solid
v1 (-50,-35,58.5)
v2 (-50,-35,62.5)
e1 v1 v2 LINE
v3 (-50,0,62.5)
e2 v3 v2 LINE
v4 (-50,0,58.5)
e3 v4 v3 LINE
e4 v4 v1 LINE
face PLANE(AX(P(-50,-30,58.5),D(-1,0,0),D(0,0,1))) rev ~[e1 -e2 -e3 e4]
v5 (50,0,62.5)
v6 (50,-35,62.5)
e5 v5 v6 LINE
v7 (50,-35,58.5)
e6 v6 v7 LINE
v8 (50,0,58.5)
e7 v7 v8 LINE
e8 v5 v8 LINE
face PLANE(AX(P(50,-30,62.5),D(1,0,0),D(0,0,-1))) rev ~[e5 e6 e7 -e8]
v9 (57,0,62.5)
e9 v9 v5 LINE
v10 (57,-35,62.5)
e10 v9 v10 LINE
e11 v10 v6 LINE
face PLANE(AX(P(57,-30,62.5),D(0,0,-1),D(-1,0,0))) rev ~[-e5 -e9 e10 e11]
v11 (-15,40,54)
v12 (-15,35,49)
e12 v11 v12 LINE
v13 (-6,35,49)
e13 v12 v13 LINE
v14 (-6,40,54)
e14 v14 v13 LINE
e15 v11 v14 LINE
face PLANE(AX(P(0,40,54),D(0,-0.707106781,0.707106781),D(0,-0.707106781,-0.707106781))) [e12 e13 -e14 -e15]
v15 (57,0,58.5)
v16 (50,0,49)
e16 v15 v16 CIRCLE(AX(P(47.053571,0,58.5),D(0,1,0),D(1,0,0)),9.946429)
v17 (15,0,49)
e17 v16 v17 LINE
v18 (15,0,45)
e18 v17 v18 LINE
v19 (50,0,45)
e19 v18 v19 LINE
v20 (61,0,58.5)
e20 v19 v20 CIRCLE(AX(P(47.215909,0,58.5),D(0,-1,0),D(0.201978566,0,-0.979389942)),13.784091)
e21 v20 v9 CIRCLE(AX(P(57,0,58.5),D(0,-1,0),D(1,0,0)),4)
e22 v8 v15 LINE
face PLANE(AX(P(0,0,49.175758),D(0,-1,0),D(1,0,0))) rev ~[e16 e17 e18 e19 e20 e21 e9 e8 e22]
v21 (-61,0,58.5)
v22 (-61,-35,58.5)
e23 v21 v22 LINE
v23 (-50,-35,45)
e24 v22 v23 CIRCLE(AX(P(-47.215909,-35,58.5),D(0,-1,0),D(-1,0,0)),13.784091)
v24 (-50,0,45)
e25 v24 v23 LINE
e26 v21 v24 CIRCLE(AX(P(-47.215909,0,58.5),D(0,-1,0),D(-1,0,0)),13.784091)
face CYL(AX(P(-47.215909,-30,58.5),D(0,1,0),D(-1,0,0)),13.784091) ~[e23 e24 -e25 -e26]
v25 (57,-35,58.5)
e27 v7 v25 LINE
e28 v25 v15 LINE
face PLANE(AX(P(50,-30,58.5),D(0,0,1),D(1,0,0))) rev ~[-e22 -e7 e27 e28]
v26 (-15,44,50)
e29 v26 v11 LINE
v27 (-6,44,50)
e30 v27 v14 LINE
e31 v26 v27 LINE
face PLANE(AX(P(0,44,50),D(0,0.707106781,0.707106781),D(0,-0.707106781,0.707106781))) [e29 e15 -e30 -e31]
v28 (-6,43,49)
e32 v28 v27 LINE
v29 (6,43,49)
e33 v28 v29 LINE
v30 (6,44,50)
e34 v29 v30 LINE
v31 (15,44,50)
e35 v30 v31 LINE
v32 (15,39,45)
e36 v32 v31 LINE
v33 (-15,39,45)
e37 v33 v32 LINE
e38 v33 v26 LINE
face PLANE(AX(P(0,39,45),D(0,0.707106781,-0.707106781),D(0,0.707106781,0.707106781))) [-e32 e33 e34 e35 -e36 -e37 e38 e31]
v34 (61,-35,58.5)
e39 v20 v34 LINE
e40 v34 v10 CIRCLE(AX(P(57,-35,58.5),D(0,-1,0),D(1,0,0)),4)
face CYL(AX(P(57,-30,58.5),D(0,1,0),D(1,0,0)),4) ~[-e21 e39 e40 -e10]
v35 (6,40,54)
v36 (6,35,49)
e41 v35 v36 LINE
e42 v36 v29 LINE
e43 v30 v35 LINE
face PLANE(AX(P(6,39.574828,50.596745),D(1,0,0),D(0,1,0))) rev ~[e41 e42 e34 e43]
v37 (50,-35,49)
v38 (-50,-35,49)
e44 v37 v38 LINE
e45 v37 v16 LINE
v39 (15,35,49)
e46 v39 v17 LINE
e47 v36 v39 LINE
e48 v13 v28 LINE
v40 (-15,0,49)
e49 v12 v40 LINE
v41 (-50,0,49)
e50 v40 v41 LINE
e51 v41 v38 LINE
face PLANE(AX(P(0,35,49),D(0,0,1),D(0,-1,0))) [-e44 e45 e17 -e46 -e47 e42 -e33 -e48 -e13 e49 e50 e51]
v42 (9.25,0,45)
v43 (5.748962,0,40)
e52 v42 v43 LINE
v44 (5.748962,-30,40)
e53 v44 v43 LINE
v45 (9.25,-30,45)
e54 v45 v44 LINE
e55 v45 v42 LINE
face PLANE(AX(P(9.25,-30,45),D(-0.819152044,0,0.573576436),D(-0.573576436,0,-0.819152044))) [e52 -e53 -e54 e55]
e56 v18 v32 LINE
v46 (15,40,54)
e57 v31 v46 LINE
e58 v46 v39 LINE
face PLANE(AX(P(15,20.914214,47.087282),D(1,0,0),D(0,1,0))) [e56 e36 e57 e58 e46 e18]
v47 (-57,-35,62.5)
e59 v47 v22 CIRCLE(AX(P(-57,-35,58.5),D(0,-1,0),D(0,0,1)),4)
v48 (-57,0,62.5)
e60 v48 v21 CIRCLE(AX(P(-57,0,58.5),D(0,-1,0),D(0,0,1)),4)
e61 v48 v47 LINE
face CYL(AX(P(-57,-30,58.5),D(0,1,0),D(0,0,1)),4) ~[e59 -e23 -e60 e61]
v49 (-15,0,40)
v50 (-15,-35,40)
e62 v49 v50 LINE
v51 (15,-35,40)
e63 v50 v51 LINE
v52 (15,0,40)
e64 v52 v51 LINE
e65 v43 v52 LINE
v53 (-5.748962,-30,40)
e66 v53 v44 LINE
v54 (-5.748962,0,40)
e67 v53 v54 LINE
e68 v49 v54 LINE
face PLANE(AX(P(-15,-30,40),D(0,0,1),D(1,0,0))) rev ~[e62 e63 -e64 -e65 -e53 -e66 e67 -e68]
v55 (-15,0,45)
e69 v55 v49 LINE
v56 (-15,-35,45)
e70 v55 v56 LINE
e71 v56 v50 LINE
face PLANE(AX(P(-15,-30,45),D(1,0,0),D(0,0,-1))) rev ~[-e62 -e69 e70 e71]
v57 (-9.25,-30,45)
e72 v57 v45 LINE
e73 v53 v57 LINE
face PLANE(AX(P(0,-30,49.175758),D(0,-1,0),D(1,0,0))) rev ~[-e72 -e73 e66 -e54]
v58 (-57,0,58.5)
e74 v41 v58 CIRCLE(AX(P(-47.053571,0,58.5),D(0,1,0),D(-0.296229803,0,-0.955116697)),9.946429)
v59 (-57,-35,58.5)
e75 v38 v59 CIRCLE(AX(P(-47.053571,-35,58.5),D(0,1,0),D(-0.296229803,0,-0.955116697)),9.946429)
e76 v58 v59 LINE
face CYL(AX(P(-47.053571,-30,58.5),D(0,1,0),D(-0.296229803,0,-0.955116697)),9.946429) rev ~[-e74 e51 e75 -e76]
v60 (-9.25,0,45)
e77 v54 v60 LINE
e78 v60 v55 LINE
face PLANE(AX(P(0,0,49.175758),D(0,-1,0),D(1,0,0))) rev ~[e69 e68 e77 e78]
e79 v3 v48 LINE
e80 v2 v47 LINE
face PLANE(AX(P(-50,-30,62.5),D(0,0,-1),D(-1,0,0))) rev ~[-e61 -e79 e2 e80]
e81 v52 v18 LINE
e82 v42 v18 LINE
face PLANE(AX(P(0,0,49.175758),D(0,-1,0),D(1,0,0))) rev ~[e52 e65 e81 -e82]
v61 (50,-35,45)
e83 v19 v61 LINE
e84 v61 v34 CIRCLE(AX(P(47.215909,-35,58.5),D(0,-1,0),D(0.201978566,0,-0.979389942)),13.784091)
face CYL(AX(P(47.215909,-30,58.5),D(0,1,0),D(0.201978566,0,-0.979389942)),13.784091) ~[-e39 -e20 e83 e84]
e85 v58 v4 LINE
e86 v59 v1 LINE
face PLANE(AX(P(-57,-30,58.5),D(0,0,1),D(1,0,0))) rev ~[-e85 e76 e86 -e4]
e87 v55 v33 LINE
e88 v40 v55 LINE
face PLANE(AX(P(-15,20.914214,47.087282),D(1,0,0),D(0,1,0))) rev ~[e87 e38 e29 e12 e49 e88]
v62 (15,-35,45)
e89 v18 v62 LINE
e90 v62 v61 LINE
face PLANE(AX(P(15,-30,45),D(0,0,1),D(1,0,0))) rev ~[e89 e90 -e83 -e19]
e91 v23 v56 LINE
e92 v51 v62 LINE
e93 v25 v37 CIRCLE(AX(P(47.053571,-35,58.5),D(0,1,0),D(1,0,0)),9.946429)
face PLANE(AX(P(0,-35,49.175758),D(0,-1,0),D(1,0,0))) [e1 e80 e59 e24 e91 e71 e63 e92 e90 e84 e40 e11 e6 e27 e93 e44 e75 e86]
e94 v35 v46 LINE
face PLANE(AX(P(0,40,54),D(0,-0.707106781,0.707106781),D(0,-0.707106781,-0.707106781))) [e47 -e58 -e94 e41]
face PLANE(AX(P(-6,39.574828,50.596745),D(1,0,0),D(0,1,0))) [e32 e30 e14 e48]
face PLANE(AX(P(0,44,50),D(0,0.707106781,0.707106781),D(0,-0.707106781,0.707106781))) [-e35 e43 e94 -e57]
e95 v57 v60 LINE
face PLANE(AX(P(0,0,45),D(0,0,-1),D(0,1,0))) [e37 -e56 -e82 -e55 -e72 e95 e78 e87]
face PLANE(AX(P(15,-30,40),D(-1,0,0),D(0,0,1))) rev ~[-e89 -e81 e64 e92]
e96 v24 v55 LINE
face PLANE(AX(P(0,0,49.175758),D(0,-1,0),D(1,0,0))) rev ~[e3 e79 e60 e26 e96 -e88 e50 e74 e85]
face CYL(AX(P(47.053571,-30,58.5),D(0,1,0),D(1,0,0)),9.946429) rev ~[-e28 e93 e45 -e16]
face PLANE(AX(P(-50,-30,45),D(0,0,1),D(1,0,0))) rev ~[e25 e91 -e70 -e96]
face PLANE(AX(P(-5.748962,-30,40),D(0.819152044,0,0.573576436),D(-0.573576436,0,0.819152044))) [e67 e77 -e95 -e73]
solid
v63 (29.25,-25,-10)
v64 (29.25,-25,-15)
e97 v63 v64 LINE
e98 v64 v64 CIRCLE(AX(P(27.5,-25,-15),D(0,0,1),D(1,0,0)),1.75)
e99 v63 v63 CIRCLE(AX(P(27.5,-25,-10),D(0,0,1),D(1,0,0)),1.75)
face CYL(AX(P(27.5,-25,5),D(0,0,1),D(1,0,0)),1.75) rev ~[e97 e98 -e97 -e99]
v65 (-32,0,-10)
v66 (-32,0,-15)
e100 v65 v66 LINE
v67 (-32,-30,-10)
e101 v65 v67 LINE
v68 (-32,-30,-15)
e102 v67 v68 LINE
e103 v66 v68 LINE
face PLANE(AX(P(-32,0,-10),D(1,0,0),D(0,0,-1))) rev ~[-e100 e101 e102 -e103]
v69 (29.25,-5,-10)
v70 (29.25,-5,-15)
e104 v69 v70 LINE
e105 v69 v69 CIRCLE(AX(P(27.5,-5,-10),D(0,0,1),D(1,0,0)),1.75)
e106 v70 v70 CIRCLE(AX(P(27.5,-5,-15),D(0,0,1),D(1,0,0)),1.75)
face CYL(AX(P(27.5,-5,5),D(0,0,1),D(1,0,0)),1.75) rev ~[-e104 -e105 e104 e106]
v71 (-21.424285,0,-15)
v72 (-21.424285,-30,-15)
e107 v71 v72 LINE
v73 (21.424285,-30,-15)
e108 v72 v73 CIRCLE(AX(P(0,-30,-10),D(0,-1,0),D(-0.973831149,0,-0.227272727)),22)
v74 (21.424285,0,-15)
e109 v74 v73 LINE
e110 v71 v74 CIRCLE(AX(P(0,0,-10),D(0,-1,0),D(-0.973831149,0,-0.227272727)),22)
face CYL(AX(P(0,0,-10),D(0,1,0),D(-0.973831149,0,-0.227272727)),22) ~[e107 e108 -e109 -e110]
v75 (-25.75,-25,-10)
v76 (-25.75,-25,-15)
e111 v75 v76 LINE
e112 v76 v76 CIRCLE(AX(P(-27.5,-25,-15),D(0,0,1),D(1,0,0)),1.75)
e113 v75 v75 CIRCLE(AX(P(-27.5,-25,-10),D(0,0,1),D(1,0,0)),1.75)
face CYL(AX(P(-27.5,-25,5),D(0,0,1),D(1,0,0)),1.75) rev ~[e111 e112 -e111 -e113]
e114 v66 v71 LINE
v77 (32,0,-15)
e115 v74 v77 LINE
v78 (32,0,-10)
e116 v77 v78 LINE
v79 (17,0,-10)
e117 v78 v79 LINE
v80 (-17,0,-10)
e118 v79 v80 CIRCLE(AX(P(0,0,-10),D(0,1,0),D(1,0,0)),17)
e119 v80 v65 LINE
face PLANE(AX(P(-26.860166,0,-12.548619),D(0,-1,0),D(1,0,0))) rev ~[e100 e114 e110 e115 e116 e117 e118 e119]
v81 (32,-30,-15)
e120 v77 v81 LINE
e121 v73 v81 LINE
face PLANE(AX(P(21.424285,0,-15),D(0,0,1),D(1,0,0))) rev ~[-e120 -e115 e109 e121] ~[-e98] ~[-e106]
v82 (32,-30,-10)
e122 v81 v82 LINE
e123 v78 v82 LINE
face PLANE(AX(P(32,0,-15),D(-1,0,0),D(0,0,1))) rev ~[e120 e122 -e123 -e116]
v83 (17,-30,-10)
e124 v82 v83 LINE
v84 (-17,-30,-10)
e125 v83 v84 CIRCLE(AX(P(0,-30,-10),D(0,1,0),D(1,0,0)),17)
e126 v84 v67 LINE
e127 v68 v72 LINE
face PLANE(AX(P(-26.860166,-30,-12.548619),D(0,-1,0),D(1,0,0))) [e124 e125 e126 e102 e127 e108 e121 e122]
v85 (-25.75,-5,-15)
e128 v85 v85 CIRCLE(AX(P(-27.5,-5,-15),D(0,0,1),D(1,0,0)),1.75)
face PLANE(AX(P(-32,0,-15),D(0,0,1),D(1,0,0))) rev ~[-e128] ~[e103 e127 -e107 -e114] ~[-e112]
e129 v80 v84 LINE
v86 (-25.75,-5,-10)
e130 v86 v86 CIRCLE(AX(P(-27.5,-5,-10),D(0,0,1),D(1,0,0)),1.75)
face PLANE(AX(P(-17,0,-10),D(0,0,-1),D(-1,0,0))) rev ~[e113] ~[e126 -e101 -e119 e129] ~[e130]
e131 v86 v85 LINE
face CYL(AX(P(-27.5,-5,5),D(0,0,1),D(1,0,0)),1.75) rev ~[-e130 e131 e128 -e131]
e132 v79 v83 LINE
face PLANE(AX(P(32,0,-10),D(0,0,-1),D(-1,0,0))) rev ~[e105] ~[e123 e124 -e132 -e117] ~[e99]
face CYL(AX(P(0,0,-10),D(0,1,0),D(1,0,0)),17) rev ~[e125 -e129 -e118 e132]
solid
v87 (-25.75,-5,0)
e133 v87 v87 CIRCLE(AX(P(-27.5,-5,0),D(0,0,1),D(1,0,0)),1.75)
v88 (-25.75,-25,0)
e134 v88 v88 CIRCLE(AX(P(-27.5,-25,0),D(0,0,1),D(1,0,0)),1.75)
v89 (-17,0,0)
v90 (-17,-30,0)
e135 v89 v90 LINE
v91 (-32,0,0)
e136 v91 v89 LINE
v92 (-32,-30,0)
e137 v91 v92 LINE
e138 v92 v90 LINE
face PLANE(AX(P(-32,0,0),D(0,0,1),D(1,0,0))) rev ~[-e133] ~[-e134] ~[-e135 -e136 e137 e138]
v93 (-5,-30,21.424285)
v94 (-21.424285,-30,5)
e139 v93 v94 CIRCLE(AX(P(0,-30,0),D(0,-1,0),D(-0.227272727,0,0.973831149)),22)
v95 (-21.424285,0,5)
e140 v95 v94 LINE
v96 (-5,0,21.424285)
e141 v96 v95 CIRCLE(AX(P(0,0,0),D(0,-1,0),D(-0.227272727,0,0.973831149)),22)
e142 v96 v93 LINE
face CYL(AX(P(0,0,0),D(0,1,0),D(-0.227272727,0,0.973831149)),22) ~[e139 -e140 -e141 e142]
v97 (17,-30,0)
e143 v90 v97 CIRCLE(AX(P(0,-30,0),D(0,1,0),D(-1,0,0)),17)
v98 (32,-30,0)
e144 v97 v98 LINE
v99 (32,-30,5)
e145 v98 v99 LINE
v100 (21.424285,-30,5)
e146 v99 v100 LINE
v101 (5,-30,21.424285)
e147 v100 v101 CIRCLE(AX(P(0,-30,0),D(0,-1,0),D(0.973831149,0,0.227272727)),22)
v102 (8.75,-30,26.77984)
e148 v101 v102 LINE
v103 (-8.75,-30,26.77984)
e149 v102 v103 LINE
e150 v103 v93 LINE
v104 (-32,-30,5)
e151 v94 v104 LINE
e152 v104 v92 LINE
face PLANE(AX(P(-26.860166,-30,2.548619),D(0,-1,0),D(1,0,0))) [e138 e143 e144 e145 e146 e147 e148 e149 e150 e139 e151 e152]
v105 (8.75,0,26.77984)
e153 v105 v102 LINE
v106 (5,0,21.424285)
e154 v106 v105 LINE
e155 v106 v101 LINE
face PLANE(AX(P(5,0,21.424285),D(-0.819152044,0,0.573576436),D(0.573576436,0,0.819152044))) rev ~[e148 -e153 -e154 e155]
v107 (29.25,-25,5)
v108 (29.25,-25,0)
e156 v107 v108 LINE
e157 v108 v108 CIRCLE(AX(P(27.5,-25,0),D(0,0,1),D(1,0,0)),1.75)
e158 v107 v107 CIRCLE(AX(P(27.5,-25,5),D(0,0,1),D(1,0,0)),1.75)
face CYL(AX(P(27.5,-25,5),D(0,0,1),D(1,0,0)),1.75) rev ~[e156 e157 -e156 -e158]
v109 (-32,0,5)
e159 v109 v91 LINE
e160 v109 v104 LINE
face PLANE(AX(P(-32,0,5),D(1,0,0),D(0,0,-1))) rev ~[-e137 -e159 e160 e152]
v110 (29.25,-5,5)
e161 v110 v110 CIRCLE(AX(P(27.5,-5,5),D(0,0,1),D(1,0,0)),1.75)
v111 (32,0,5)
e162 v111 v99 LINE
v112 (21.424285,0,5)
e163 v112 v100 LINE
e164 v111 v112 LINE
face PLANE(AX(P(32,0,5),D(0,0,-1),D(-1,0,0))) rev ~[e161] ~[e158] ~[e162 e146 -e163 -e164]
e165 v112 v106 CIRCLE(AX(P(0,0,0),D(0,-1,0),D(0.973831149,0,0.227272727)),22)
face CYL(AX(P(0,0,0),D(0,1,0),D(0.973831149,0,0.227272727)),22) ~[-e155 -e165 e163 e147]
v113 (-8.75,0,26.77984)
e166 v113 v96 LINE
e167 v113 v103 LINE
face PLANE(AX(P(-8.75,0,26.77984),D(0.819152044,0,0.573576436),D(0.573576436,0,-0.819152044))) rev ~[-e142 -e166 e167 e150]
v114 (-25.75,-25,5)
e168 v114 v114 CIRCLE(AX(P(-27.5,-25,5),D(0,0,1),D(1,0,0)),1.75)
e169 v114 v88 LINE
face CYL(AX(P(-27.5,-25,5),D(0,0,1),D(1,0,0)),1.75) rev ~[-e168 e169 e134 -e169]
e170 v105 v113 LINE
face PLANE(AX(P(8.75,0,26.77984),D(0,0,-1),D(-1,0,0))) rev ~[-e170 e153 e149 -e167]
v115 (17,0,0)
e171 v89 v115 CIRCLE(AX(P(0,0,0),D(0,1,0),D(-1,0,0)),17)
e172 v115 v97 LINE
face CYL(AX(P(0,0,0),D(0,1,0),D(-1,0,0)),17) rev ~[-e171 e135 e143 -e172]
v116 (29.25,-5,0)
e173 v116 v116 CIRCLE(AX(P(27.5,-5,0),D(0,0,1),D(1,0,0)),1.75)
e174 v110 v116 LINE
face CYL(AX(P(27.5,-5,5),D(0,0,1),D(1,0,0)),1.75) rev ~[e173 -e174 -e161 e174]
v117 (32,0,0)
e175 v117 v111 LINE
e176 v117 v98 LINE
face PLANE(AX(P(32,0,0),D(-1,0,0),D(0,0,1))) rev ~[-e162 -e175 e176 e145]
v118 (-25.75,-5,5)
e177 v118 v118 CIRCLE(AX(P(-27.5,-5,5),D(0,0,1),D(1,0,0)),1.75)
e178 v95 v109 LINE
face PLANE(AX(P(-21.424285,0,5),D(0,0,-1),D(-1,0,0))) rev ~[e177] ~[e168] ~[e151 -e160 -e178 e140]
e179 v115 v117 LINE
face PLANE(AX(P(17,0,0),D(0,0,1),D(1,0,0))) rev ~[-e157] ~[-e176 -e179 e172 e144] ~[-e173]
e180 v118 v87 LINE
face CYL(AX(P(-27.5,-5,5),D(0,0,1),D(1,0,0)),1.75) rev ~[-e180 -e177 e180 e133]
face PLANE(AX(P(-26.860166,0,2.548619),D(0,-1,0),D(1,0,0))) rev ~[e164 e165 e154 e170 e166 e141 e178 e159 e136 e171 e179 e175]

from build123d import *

# Parameters (mm, degrees)
F3_DEPTH      = 30
F4_DEPTH      = 5
F6_DEPTH      = 15
F6_DEPTH_BACK = 15
F7_DEPTH      = 6
F8_DEPTH      = 30
F9_DEPTH      = 30
F10_R         = 1.75
F11_DEPTH     = 50


# Not quite as in the source:
# - a feature names something its author has since deleted; it is built from what else it names


with BuildPart() as f3:
    # F2 (on offset) → F3 (new body)
    with BuildSketch(Plane.XZ.offset(30)):
        with BuildLine():
            Line((50, 49), (-50, 49))
            ThreePointArc((-50, 49), (-55.0610018108, 52.5997881394), (-57, 58.5))
            Line((-57, 58.5), (-50, 58.5))
            Line((-50, 58.5), (-50, 62.5))
            Line((-50, 62.5), (-57, 62.5))
            ThreePointArc((-57, 62.5), (-59.8284271247, 61.3284271247), (-61, 58.5))
            ThreePointArc((-61, 58.5), (-57.9018186072, 49.7929626164), (-50, 45))
            Line((-50, 45), (-15, 45))
            Line((-15, 45), (-15, 40))
            Line((-15, 40), (-5.748962309, 40))
            Line((-5.748962309, 40), (-9.25, 45))
            Line((-9.25, 45), (9.25, 45))
            Line((9.25, 45), (5.748962309, 40))
            Line((5.748962309, 40), (15, 40))
            Line((15, 40), (15, 45))
            Line((15, 45), (50, 45))
            ThreePointArc((50, 45), (57.9018186072, 49.7929626164), (61, 58.5))
            ThreePointArc((61, 58.5), (59.8284271247, 61.3284271247), (57, 62.5))
            Line((57, 62.5), (50, 62.5))
            Line((50, 62.5), (50, 58.5))
            Line((50, 58.5), (57, 58.5))
            ThreePointArc((57, 58.5), (55.0610018108, 52.5997881394), (50, 49))
        make_face()
    extrude(amount=-F3_DEPTH)

    # F2 (on offset) → F4 (join)
    with BuildSketch(Plane.XZ.offset(30)):
        with BuildLine():
            Line((50, 49), (-50, 49))
            ThreePointArc((-50, 49), (-55.0610018108, 52.5997881394), (-57, 58.5))
            Line((-57, 58.5), (-50, 58.5))
            Line((-50, 58.5), (-50, 62.5))
            Line((-50, 62.5), (-57, 62.5))
            ThreePointArc((-57, 62.5), (-59.8284271247, 61.3284271247), (-61, 58.5))
            ThreePointArc((-61, 58.5), (-57.9018186072, 49.7929626164), (-50, 45))
            Line((-50, 45), (-15, 45))
            Line((-15, 45), (-15, 40))
            Line((-15, 40), (-5.748962309, 40))
            Line((-5.748962309, 40), (-9.25, 45))
            Line((-9.25, 45), (9.25, 45))
            Line((9.25, 45), (5.748962309, 40))
            Line((5.748962309, 40), (15, 40))
            Line((15, 40), (15, 45))
            Line((15, 45), (50, 45))
            ThreePointArc((50, 45), (57.9018186072, 49.7929626164), (61, 58.5))
            ThreePointArc((61, 58.5), (59.8284271247, 61.3284271247), (57, 62.5))
            Line((57, 62.5), (50, 62.5))
            Line((50, 62.5), (50, 58.5))
            Line((50, 58.5), (57, 58.5))
            ThreePointArc((57, 58.5), (55.0610018108, 52.5997881394), (50, 49))
        make_face()
        Polygon((-9.25, 45), (-5.748962309, 40), (5.748962309, 40), (9.25, 45), align=None)
    extrude(amount=F4_DEPTH)

    # F5 (on Right) → F6 (join, two sides)
    with BuildSketch(Plane.YZ) as f6_sk:
        Polygon((35, 49), (0, 49), (0, 45), (39, 45), (43, 49), align=None)
        Polygon((40, 54), (35, 49), (43, 49), (44, 50), align=None)
    extrude(amount=F6_DEPTH)
    extrude(f6_sk.sketch, amount=-F6_DEPTH_BACK)

    # F5 (on Right) → F7 (cut, symmetric)
    with BuildSketch(Plane.YZ):
        Polygon((40, 54), (35, 49), (43, 49), (44, 50), align=None)
    extrude(amount=F7_DEPTH, both=True, mode=Mode.SUBTRACT)


with BuildPart() as f8:
    # F0 (on Front) → F8 (new body)
    with BuildSketch(Plane.XZ):
        with BuildLine():
            Line((-32, 0), (-22, 0))
            ThreePointArc((-22, 0), (-21.8555974099, 2.516517804), (-21.4242852856, 5))
            Line((-21.4242852856, 5), (-32, 5))
            Line((-32, 5), (-32, 0))
        make_face()
        with BuildLine():
            Line((-22, 0), (-17, 0))
            Line((-17, 0), (-17, 5))
            Line((-17, 5), (-21.4242852856, 5))
            ThreePointArc((-21.4242852856, 5), (-21.8555974099, 2.516517804), (-22, 0))
        make_face()
        with BuildLine():
            ThreePointArc((-17, 0), (0, 17), (17, 0))
            Line((17, 0), (17, 5))
            Line((17, 5), (21.4242852856, 5))
            ThreePointArc((21.4242852856, 5), (15.5563491861, 15.5563491861), (5, 21.4242852856))
            ThreePointArc((5, 21.4242852856), (0, 22), (-5, 21.4242852856))
            ThreePointArc((-5, 21.4242852856), (-15.5563491861, 15.5563491861), (-21.4242852856, 5))
            Line((-21.4242852856, 5), (-17, 5))
            Line((-17, 5), (-17, 0))
        make_face()
        with BuildLine():
            Line((17, 5), (17, 0))
            Line((17, 0), (22, 0))
            ThreePointArc((22, 0), (21.8555974099, 2.516517804), (21.4242852856, 5))
            Line((21.4242852856, 5), (17, 5))
        make_face()
        with BuildLine():
            ThreePointArc((21.4242852856, 5), (21.8555974099, 2.516517804), (22, 0))
            Line((22, 0), (32, 0))
            Line((32, 0), (32, 5))
            Line((32, 5), (21.4242852856, 5))
        make_face()
        with BuildLine():
            ThreePointArc((-5, 21.4242852856), (0, 22), (5, 21.4242852856))
            Line((5, 21.4242852856), (8.75, 26.7798403109))
            Line((8.75, 26.7798403109), (-8.75, 26.7798403109))
            Line((-8.75, 26.7798403109), (-5, 21.4242852856))
        make_face()
    extrude(amount=F8_DEPTH)


with BuildPart() as f9:
    # F0 (on Front) → F9 (new body)
    with BuildSketch(Plane.XZ):
        with BuildLine():
            ThreePointArc((-21.4242852856, -15), (-21.8555974099, -12.516517804), (-22, -10))
            Line((-22, -10), (-32, -10))
            Line((-32, -10), (-32, -15))
            Line((-32, -15), (-21.4242852856, -15))
        make_face()
        with BuildLine():
            Line((-17, -15), (-17, -10))
            Line((-17, -10), (-22, -10))
            ThreePointArc((-22, -10), (-21.8555974099, -12.516517804), (-21.4242852856, -15))
            Line((-21.4242852856, -15), (-17, -15))
        make_face()
        with BuildLine():
            ThreePointArc((17, -10), (0, -27), (-17, -10))
            Line((-17, -10), (-17, -15))
            Line((-17, -15), (-21.4242852856, -15))
            ThreePointArc((-21.4242852856, -15), (0, -32), (21.4242852856, -15))
            Line((21.4242852856, -15), (17, -15))
            Line((17, -15), (17, -10))
        make_face()
        with BuildLine():
            Line((22, -10), (17, -10))
            Line((17, -10), (17, -15))
            Line((17, -15), (21.4242852856, -15))
            ThreePointArc((21.4242852856, -15), (21.8555974099, -12.516517804), (22, -10))
        make_face()
        with BuildLine():
            Line((32, -10), (22, -10))
            ThreePointArc((22, -10), (21.8555974099, -12.516517804), (21.4242852856, -15))
            Line((21.4242852856, -15), (32, -15))
            Line((32, -15), (32, -10))
        make_face()
    extrude(amount=F9_DEPTH)


with BuildPart() as f11_tool:
    # F10 (on face) → F11 (new body)
    with BuildSketch(Plane.XY.offset(5)):
        with Locations((-27.5, -25)):
            Circle(F10_R)
        with Locations((-27.5, -5)):
            Circle(F10_R)
        with Locations((27.5, -5)):
            Circle(F10_R)
        with Locations((27.5, -25)):
            Circle(F10_R)
    extrude(amount=-F11_DEPTH)


with BuildPart() as f8_1:
    add(f8.part)

    # F11: cut by f11_tool
    add(f11_tool.part, mode=Mode.SUBTRACT)


with BuildPart() as f9_1:
    add(f9.part)

    # F11: cut by f11_tool
    add(f11_tool.part, mode=Mode.SUBTRACT)


solid = Compound([f3.part, f8_1.part, f9_1.part])
